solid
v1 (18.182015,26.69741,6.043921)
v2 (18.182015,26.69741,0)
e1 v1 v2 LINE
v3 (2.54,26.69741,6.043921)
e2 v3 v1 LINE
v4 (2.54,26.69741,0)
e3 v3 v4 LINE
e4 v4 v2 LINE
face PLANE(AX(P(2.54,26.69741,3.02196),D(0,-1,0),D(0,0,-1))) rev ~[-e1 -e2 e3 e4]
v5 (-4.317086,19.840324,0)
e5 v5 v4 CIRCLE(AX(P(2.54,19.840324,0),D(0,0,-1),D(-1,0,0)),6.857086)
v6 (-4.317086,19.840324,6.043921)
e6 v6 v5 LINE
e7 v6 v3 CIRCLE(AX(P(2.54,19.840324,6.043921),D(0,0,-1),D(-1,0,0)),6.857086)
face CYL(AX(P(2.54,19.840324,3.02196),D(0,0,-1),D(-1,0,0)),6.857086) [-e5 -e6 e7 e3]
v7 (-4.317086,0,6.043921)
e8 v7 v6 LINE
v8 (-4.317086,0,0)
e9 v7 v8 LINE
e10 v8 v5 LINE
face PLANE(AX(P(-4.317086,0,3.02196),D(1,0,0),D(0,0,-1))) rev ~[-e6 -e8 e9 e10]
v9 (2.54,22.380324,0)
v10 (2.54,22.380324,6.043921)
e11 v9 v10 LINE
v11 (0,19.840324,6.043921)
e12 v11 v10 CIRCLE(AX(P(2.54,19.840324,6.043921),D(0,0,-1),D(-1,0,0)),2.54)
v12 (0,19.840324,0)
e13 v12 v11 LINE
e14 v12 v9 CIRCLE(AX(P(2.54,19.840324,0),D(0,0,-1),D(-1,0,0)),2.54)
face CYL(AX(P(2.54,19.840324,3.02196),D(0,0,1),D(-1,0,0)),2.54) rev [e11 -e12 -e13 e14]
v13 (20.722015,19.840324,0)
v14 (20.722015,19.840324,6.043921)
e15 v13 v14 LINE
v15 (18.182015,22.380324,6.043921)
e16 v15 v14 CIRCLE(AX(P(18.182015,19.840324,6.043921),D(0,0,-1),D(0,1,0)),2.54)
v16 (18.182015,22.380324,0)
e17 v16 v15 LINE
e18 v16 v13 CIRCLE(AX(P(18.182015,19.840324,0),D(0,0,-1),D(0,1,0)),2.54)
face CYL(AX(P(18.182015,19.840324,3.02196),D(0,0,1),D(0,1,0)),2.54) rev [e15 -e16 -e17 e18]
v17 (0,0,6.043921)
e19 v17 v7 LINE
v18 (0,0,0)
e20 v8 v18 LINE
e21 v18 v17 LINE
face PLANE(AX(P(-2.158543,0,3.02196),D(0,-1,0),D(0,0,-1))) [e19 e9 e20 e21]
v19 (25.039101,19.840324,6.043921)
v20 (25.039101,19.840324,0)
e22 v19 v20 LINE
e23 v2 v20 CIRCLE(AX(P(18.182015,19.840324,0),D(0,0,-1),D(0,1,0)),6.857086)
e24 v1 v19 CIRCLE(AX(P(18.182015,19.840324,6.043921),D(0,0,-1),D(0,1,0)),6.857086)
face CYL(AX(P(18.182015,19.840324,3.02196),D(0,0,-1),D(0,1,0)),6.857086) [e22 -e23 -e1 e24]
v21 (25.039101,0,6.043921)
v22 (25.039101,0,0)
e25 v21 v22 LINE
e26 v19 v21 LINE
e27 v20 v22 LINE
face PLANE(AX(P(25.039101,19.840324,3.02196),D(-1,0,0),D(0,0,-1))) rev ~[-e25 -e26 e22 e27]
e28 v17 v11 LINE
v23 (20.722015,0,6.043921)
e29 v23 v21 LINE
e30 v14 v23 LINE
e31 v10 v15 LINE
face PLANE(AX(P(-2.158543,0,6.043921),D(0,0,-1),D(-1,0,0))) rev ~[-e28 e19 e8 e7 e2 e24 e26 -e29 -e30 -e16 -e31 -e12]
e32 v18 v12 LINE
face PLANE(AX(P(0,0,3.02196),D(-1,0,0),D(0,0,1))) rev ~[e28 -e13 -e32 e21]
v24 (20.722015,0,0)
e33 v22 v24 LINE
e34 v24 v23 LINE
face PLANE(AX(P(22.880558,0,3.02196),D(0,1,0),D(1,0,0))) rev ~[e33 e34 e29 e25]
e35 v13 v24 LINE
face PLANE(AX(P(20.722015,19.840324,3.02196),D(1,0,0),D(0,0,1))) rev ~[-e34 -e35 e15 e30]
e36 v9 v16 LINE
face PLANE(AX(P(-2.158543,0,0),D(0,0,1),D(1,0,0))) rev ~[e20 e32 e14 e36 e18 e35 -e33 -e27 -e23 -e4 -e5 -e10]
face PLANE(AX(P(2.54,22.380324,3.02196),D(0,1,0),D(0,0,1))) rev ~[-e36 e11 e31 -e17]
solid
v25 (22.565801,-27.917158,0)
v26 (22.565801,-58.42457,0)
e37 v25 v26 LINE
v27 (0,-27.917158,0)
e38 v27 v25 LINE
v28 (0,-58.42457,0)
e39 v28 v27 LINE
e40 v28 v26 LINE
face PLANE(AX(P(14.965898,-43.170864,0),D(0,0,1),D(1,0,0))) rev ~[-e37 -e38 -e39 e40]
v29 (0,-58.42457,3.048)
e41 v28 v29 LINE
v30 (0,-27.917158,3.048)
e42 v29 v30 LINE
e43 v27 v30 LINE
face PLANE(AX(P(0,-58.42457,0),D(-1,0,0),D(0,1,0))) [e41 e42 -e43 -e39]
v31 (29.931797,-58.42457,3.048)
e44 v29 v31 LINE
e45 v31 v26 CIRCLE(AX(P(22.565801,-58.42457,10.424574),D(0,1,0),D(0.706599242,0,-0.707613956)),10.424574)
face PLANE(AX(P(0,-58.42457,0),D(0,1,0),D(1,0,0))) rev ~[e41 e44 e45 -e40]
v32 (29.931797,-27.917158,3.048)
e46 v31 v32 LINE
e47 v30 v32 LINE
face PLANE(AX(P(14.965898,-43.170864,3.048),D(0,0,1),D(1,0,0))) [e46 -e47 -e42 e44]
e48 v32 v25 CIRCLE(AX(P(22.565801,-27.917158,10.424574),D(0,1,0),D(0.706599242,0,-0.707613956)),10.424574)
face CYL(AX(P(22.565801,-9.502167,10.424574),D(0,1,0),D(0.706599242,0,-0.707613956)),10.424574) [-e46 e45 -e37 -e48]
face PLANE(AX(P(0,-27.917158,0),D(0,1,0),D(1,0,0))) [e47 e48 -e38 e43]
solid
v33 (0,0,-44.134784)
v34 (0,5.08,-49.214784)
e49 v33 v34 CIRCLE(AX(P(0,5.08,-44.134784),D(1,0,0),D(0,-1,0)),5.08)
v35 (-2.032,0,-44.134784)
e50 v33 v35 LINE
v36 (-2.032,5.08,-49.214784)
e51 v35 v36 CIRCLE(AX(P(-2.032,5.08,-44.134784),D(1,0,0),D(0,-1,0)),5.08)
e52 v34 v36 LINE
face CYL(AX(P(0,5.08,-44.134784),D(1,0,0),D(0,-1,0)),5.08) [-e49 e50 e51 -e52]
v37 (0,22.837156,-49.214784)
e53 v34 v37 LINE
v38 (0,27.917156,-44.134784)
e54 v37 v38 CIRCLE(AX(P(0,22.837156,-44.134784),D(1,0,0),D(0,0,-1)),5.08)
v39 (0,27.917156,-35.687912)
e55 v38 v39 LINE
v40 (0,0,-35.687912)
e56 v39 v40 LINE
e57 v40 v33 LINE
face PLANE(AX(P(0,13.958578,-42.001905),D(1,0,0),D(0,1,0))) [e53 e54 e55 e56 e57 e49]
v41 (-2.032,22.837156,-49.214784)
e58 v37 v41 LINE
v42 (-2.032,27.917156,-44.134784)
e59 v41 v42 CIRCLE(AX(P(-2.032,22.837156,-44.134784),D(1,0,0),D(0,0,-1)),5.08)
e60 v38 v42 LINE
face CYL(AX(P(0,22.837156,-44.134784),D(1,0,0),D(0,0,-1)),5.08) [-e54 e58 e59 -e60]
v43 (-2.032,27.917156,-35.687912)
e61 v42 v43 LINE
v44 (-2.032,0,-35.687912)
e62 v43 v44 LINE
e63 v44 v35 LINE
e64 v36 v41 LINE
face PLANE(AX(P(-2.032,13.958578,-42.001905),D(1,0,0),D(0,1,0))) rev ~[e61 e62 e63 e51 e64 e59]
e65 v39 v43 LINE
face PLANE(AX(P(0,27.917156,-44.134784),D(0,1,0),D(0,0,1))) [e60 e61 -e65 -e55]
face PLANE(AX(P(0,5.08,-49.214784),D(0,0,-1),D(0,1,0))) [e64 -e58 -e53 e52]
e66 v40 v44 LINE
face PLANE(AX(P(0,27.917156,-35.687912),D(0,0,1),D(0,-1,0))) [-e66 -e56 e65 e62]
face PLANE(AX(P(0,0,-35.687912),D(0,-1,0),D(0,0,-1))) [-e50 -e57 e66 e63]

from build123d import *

# Parameters (mm, degrees)
F1_W        = 4.31708619
F1_H        = 6.0439207591
F3_W        = 29.9317967147
F3_H        = 30.5074118078
F4_DEPTH    = 3.048
F5_T1_DEPTH = 67.3373928333
F7_DEPTH    = 2.032


# Not quite as in the source:
# - a fillet or chamfer that OpenCascade refuses, or shapes differently, is made with other operations: its cross-section is extruded or revolved along the edge and cut away or added


with BuildPart() as f2:
    # F2: sweep along a path in F0
    with BuildLine(Plane.XY) as f2_path:
        Line((0, 0), (0, 19.8403237551))
        ThreePointArc((0, 19.8403237551), (0.7439487758, 21.6363749794), (2.54, 22.3803237551))
        Line((2.54, 22.3803237551), (18.1820148295, 22.3803237551))
        ThreePointArc((18.1820148295, 22.3803237551), (19.9780660537, 21.6363749794), (20.7220148295, 19.8403237551))
        Line((20.7220148295, 19.8403237551), (20.7220148295, 0))
    # F1 (on Front) → F2 (sweep)
    with BuildSketch(Plane.XZ):
        with Locations((-2.158543095, 3.0219603796)):
            Rectangle(F1_W, F1_H)
    sweep(path=f2_path.line)


with BuildPart() as f4:
    # F3 (on Top) → F4 (new body)
    with BuildSketch(Plane.XY):
        with Locations((14.9658983573, -43.1708637625)):
            Rectangle(F3_W, F3_H)
    extrude(amount=F4_DEPTH)

    # F5: fillet of radius 10.4245741623 on 1 edges, made by hand

    # F5_s2 → F5_t1 (cut)
    with BuildSketch(Plane.XZ.offset(9.5021673459)):
        with BuildLine():
            ThreePointArc((29.9317967147, 3.048), (26.5516568822, 0.792092891), (22.5658005096, 0))
            Line((22.5658005096, 0), (29.9317967147, 0))
            Line((29.9317967147, 0), (29.9317967147, 3.048))
        make_face()
    extrude(amount=F5_T1_DEPTH, mode=Mode.SUBTRACT)


with BuildPart() as f7:
    # F6 (on Right) → F7 (new body)
    with BuildSketch(Plane.YZ):
        with BuildLine():
            ThreePointArc((0, -44.1347840559), (1.4878975516, -47.7268865044), (5.08, -49.2147840559))
            Line((5.08, -49.2147840559), (22.837155996, -49.2147840559))
            ThreePointArc((22.837155996, -49.2147840559), (26.4292584444, -47.7268865044), (27.917155996, -44.1347840559))
            Line((27.917155996, -44.1347840559), (27.917155996, -35.6879122555))
            Line((27.917155996, -35.6879122555), (0, -35.6879122555))
            Line((0, -35.6879122555), (0, -44.1347840559))
        make_face()
    extrude(amount=-F7_DEPTH)


solid = Compound([f2.part, f4.part, f7.part])
